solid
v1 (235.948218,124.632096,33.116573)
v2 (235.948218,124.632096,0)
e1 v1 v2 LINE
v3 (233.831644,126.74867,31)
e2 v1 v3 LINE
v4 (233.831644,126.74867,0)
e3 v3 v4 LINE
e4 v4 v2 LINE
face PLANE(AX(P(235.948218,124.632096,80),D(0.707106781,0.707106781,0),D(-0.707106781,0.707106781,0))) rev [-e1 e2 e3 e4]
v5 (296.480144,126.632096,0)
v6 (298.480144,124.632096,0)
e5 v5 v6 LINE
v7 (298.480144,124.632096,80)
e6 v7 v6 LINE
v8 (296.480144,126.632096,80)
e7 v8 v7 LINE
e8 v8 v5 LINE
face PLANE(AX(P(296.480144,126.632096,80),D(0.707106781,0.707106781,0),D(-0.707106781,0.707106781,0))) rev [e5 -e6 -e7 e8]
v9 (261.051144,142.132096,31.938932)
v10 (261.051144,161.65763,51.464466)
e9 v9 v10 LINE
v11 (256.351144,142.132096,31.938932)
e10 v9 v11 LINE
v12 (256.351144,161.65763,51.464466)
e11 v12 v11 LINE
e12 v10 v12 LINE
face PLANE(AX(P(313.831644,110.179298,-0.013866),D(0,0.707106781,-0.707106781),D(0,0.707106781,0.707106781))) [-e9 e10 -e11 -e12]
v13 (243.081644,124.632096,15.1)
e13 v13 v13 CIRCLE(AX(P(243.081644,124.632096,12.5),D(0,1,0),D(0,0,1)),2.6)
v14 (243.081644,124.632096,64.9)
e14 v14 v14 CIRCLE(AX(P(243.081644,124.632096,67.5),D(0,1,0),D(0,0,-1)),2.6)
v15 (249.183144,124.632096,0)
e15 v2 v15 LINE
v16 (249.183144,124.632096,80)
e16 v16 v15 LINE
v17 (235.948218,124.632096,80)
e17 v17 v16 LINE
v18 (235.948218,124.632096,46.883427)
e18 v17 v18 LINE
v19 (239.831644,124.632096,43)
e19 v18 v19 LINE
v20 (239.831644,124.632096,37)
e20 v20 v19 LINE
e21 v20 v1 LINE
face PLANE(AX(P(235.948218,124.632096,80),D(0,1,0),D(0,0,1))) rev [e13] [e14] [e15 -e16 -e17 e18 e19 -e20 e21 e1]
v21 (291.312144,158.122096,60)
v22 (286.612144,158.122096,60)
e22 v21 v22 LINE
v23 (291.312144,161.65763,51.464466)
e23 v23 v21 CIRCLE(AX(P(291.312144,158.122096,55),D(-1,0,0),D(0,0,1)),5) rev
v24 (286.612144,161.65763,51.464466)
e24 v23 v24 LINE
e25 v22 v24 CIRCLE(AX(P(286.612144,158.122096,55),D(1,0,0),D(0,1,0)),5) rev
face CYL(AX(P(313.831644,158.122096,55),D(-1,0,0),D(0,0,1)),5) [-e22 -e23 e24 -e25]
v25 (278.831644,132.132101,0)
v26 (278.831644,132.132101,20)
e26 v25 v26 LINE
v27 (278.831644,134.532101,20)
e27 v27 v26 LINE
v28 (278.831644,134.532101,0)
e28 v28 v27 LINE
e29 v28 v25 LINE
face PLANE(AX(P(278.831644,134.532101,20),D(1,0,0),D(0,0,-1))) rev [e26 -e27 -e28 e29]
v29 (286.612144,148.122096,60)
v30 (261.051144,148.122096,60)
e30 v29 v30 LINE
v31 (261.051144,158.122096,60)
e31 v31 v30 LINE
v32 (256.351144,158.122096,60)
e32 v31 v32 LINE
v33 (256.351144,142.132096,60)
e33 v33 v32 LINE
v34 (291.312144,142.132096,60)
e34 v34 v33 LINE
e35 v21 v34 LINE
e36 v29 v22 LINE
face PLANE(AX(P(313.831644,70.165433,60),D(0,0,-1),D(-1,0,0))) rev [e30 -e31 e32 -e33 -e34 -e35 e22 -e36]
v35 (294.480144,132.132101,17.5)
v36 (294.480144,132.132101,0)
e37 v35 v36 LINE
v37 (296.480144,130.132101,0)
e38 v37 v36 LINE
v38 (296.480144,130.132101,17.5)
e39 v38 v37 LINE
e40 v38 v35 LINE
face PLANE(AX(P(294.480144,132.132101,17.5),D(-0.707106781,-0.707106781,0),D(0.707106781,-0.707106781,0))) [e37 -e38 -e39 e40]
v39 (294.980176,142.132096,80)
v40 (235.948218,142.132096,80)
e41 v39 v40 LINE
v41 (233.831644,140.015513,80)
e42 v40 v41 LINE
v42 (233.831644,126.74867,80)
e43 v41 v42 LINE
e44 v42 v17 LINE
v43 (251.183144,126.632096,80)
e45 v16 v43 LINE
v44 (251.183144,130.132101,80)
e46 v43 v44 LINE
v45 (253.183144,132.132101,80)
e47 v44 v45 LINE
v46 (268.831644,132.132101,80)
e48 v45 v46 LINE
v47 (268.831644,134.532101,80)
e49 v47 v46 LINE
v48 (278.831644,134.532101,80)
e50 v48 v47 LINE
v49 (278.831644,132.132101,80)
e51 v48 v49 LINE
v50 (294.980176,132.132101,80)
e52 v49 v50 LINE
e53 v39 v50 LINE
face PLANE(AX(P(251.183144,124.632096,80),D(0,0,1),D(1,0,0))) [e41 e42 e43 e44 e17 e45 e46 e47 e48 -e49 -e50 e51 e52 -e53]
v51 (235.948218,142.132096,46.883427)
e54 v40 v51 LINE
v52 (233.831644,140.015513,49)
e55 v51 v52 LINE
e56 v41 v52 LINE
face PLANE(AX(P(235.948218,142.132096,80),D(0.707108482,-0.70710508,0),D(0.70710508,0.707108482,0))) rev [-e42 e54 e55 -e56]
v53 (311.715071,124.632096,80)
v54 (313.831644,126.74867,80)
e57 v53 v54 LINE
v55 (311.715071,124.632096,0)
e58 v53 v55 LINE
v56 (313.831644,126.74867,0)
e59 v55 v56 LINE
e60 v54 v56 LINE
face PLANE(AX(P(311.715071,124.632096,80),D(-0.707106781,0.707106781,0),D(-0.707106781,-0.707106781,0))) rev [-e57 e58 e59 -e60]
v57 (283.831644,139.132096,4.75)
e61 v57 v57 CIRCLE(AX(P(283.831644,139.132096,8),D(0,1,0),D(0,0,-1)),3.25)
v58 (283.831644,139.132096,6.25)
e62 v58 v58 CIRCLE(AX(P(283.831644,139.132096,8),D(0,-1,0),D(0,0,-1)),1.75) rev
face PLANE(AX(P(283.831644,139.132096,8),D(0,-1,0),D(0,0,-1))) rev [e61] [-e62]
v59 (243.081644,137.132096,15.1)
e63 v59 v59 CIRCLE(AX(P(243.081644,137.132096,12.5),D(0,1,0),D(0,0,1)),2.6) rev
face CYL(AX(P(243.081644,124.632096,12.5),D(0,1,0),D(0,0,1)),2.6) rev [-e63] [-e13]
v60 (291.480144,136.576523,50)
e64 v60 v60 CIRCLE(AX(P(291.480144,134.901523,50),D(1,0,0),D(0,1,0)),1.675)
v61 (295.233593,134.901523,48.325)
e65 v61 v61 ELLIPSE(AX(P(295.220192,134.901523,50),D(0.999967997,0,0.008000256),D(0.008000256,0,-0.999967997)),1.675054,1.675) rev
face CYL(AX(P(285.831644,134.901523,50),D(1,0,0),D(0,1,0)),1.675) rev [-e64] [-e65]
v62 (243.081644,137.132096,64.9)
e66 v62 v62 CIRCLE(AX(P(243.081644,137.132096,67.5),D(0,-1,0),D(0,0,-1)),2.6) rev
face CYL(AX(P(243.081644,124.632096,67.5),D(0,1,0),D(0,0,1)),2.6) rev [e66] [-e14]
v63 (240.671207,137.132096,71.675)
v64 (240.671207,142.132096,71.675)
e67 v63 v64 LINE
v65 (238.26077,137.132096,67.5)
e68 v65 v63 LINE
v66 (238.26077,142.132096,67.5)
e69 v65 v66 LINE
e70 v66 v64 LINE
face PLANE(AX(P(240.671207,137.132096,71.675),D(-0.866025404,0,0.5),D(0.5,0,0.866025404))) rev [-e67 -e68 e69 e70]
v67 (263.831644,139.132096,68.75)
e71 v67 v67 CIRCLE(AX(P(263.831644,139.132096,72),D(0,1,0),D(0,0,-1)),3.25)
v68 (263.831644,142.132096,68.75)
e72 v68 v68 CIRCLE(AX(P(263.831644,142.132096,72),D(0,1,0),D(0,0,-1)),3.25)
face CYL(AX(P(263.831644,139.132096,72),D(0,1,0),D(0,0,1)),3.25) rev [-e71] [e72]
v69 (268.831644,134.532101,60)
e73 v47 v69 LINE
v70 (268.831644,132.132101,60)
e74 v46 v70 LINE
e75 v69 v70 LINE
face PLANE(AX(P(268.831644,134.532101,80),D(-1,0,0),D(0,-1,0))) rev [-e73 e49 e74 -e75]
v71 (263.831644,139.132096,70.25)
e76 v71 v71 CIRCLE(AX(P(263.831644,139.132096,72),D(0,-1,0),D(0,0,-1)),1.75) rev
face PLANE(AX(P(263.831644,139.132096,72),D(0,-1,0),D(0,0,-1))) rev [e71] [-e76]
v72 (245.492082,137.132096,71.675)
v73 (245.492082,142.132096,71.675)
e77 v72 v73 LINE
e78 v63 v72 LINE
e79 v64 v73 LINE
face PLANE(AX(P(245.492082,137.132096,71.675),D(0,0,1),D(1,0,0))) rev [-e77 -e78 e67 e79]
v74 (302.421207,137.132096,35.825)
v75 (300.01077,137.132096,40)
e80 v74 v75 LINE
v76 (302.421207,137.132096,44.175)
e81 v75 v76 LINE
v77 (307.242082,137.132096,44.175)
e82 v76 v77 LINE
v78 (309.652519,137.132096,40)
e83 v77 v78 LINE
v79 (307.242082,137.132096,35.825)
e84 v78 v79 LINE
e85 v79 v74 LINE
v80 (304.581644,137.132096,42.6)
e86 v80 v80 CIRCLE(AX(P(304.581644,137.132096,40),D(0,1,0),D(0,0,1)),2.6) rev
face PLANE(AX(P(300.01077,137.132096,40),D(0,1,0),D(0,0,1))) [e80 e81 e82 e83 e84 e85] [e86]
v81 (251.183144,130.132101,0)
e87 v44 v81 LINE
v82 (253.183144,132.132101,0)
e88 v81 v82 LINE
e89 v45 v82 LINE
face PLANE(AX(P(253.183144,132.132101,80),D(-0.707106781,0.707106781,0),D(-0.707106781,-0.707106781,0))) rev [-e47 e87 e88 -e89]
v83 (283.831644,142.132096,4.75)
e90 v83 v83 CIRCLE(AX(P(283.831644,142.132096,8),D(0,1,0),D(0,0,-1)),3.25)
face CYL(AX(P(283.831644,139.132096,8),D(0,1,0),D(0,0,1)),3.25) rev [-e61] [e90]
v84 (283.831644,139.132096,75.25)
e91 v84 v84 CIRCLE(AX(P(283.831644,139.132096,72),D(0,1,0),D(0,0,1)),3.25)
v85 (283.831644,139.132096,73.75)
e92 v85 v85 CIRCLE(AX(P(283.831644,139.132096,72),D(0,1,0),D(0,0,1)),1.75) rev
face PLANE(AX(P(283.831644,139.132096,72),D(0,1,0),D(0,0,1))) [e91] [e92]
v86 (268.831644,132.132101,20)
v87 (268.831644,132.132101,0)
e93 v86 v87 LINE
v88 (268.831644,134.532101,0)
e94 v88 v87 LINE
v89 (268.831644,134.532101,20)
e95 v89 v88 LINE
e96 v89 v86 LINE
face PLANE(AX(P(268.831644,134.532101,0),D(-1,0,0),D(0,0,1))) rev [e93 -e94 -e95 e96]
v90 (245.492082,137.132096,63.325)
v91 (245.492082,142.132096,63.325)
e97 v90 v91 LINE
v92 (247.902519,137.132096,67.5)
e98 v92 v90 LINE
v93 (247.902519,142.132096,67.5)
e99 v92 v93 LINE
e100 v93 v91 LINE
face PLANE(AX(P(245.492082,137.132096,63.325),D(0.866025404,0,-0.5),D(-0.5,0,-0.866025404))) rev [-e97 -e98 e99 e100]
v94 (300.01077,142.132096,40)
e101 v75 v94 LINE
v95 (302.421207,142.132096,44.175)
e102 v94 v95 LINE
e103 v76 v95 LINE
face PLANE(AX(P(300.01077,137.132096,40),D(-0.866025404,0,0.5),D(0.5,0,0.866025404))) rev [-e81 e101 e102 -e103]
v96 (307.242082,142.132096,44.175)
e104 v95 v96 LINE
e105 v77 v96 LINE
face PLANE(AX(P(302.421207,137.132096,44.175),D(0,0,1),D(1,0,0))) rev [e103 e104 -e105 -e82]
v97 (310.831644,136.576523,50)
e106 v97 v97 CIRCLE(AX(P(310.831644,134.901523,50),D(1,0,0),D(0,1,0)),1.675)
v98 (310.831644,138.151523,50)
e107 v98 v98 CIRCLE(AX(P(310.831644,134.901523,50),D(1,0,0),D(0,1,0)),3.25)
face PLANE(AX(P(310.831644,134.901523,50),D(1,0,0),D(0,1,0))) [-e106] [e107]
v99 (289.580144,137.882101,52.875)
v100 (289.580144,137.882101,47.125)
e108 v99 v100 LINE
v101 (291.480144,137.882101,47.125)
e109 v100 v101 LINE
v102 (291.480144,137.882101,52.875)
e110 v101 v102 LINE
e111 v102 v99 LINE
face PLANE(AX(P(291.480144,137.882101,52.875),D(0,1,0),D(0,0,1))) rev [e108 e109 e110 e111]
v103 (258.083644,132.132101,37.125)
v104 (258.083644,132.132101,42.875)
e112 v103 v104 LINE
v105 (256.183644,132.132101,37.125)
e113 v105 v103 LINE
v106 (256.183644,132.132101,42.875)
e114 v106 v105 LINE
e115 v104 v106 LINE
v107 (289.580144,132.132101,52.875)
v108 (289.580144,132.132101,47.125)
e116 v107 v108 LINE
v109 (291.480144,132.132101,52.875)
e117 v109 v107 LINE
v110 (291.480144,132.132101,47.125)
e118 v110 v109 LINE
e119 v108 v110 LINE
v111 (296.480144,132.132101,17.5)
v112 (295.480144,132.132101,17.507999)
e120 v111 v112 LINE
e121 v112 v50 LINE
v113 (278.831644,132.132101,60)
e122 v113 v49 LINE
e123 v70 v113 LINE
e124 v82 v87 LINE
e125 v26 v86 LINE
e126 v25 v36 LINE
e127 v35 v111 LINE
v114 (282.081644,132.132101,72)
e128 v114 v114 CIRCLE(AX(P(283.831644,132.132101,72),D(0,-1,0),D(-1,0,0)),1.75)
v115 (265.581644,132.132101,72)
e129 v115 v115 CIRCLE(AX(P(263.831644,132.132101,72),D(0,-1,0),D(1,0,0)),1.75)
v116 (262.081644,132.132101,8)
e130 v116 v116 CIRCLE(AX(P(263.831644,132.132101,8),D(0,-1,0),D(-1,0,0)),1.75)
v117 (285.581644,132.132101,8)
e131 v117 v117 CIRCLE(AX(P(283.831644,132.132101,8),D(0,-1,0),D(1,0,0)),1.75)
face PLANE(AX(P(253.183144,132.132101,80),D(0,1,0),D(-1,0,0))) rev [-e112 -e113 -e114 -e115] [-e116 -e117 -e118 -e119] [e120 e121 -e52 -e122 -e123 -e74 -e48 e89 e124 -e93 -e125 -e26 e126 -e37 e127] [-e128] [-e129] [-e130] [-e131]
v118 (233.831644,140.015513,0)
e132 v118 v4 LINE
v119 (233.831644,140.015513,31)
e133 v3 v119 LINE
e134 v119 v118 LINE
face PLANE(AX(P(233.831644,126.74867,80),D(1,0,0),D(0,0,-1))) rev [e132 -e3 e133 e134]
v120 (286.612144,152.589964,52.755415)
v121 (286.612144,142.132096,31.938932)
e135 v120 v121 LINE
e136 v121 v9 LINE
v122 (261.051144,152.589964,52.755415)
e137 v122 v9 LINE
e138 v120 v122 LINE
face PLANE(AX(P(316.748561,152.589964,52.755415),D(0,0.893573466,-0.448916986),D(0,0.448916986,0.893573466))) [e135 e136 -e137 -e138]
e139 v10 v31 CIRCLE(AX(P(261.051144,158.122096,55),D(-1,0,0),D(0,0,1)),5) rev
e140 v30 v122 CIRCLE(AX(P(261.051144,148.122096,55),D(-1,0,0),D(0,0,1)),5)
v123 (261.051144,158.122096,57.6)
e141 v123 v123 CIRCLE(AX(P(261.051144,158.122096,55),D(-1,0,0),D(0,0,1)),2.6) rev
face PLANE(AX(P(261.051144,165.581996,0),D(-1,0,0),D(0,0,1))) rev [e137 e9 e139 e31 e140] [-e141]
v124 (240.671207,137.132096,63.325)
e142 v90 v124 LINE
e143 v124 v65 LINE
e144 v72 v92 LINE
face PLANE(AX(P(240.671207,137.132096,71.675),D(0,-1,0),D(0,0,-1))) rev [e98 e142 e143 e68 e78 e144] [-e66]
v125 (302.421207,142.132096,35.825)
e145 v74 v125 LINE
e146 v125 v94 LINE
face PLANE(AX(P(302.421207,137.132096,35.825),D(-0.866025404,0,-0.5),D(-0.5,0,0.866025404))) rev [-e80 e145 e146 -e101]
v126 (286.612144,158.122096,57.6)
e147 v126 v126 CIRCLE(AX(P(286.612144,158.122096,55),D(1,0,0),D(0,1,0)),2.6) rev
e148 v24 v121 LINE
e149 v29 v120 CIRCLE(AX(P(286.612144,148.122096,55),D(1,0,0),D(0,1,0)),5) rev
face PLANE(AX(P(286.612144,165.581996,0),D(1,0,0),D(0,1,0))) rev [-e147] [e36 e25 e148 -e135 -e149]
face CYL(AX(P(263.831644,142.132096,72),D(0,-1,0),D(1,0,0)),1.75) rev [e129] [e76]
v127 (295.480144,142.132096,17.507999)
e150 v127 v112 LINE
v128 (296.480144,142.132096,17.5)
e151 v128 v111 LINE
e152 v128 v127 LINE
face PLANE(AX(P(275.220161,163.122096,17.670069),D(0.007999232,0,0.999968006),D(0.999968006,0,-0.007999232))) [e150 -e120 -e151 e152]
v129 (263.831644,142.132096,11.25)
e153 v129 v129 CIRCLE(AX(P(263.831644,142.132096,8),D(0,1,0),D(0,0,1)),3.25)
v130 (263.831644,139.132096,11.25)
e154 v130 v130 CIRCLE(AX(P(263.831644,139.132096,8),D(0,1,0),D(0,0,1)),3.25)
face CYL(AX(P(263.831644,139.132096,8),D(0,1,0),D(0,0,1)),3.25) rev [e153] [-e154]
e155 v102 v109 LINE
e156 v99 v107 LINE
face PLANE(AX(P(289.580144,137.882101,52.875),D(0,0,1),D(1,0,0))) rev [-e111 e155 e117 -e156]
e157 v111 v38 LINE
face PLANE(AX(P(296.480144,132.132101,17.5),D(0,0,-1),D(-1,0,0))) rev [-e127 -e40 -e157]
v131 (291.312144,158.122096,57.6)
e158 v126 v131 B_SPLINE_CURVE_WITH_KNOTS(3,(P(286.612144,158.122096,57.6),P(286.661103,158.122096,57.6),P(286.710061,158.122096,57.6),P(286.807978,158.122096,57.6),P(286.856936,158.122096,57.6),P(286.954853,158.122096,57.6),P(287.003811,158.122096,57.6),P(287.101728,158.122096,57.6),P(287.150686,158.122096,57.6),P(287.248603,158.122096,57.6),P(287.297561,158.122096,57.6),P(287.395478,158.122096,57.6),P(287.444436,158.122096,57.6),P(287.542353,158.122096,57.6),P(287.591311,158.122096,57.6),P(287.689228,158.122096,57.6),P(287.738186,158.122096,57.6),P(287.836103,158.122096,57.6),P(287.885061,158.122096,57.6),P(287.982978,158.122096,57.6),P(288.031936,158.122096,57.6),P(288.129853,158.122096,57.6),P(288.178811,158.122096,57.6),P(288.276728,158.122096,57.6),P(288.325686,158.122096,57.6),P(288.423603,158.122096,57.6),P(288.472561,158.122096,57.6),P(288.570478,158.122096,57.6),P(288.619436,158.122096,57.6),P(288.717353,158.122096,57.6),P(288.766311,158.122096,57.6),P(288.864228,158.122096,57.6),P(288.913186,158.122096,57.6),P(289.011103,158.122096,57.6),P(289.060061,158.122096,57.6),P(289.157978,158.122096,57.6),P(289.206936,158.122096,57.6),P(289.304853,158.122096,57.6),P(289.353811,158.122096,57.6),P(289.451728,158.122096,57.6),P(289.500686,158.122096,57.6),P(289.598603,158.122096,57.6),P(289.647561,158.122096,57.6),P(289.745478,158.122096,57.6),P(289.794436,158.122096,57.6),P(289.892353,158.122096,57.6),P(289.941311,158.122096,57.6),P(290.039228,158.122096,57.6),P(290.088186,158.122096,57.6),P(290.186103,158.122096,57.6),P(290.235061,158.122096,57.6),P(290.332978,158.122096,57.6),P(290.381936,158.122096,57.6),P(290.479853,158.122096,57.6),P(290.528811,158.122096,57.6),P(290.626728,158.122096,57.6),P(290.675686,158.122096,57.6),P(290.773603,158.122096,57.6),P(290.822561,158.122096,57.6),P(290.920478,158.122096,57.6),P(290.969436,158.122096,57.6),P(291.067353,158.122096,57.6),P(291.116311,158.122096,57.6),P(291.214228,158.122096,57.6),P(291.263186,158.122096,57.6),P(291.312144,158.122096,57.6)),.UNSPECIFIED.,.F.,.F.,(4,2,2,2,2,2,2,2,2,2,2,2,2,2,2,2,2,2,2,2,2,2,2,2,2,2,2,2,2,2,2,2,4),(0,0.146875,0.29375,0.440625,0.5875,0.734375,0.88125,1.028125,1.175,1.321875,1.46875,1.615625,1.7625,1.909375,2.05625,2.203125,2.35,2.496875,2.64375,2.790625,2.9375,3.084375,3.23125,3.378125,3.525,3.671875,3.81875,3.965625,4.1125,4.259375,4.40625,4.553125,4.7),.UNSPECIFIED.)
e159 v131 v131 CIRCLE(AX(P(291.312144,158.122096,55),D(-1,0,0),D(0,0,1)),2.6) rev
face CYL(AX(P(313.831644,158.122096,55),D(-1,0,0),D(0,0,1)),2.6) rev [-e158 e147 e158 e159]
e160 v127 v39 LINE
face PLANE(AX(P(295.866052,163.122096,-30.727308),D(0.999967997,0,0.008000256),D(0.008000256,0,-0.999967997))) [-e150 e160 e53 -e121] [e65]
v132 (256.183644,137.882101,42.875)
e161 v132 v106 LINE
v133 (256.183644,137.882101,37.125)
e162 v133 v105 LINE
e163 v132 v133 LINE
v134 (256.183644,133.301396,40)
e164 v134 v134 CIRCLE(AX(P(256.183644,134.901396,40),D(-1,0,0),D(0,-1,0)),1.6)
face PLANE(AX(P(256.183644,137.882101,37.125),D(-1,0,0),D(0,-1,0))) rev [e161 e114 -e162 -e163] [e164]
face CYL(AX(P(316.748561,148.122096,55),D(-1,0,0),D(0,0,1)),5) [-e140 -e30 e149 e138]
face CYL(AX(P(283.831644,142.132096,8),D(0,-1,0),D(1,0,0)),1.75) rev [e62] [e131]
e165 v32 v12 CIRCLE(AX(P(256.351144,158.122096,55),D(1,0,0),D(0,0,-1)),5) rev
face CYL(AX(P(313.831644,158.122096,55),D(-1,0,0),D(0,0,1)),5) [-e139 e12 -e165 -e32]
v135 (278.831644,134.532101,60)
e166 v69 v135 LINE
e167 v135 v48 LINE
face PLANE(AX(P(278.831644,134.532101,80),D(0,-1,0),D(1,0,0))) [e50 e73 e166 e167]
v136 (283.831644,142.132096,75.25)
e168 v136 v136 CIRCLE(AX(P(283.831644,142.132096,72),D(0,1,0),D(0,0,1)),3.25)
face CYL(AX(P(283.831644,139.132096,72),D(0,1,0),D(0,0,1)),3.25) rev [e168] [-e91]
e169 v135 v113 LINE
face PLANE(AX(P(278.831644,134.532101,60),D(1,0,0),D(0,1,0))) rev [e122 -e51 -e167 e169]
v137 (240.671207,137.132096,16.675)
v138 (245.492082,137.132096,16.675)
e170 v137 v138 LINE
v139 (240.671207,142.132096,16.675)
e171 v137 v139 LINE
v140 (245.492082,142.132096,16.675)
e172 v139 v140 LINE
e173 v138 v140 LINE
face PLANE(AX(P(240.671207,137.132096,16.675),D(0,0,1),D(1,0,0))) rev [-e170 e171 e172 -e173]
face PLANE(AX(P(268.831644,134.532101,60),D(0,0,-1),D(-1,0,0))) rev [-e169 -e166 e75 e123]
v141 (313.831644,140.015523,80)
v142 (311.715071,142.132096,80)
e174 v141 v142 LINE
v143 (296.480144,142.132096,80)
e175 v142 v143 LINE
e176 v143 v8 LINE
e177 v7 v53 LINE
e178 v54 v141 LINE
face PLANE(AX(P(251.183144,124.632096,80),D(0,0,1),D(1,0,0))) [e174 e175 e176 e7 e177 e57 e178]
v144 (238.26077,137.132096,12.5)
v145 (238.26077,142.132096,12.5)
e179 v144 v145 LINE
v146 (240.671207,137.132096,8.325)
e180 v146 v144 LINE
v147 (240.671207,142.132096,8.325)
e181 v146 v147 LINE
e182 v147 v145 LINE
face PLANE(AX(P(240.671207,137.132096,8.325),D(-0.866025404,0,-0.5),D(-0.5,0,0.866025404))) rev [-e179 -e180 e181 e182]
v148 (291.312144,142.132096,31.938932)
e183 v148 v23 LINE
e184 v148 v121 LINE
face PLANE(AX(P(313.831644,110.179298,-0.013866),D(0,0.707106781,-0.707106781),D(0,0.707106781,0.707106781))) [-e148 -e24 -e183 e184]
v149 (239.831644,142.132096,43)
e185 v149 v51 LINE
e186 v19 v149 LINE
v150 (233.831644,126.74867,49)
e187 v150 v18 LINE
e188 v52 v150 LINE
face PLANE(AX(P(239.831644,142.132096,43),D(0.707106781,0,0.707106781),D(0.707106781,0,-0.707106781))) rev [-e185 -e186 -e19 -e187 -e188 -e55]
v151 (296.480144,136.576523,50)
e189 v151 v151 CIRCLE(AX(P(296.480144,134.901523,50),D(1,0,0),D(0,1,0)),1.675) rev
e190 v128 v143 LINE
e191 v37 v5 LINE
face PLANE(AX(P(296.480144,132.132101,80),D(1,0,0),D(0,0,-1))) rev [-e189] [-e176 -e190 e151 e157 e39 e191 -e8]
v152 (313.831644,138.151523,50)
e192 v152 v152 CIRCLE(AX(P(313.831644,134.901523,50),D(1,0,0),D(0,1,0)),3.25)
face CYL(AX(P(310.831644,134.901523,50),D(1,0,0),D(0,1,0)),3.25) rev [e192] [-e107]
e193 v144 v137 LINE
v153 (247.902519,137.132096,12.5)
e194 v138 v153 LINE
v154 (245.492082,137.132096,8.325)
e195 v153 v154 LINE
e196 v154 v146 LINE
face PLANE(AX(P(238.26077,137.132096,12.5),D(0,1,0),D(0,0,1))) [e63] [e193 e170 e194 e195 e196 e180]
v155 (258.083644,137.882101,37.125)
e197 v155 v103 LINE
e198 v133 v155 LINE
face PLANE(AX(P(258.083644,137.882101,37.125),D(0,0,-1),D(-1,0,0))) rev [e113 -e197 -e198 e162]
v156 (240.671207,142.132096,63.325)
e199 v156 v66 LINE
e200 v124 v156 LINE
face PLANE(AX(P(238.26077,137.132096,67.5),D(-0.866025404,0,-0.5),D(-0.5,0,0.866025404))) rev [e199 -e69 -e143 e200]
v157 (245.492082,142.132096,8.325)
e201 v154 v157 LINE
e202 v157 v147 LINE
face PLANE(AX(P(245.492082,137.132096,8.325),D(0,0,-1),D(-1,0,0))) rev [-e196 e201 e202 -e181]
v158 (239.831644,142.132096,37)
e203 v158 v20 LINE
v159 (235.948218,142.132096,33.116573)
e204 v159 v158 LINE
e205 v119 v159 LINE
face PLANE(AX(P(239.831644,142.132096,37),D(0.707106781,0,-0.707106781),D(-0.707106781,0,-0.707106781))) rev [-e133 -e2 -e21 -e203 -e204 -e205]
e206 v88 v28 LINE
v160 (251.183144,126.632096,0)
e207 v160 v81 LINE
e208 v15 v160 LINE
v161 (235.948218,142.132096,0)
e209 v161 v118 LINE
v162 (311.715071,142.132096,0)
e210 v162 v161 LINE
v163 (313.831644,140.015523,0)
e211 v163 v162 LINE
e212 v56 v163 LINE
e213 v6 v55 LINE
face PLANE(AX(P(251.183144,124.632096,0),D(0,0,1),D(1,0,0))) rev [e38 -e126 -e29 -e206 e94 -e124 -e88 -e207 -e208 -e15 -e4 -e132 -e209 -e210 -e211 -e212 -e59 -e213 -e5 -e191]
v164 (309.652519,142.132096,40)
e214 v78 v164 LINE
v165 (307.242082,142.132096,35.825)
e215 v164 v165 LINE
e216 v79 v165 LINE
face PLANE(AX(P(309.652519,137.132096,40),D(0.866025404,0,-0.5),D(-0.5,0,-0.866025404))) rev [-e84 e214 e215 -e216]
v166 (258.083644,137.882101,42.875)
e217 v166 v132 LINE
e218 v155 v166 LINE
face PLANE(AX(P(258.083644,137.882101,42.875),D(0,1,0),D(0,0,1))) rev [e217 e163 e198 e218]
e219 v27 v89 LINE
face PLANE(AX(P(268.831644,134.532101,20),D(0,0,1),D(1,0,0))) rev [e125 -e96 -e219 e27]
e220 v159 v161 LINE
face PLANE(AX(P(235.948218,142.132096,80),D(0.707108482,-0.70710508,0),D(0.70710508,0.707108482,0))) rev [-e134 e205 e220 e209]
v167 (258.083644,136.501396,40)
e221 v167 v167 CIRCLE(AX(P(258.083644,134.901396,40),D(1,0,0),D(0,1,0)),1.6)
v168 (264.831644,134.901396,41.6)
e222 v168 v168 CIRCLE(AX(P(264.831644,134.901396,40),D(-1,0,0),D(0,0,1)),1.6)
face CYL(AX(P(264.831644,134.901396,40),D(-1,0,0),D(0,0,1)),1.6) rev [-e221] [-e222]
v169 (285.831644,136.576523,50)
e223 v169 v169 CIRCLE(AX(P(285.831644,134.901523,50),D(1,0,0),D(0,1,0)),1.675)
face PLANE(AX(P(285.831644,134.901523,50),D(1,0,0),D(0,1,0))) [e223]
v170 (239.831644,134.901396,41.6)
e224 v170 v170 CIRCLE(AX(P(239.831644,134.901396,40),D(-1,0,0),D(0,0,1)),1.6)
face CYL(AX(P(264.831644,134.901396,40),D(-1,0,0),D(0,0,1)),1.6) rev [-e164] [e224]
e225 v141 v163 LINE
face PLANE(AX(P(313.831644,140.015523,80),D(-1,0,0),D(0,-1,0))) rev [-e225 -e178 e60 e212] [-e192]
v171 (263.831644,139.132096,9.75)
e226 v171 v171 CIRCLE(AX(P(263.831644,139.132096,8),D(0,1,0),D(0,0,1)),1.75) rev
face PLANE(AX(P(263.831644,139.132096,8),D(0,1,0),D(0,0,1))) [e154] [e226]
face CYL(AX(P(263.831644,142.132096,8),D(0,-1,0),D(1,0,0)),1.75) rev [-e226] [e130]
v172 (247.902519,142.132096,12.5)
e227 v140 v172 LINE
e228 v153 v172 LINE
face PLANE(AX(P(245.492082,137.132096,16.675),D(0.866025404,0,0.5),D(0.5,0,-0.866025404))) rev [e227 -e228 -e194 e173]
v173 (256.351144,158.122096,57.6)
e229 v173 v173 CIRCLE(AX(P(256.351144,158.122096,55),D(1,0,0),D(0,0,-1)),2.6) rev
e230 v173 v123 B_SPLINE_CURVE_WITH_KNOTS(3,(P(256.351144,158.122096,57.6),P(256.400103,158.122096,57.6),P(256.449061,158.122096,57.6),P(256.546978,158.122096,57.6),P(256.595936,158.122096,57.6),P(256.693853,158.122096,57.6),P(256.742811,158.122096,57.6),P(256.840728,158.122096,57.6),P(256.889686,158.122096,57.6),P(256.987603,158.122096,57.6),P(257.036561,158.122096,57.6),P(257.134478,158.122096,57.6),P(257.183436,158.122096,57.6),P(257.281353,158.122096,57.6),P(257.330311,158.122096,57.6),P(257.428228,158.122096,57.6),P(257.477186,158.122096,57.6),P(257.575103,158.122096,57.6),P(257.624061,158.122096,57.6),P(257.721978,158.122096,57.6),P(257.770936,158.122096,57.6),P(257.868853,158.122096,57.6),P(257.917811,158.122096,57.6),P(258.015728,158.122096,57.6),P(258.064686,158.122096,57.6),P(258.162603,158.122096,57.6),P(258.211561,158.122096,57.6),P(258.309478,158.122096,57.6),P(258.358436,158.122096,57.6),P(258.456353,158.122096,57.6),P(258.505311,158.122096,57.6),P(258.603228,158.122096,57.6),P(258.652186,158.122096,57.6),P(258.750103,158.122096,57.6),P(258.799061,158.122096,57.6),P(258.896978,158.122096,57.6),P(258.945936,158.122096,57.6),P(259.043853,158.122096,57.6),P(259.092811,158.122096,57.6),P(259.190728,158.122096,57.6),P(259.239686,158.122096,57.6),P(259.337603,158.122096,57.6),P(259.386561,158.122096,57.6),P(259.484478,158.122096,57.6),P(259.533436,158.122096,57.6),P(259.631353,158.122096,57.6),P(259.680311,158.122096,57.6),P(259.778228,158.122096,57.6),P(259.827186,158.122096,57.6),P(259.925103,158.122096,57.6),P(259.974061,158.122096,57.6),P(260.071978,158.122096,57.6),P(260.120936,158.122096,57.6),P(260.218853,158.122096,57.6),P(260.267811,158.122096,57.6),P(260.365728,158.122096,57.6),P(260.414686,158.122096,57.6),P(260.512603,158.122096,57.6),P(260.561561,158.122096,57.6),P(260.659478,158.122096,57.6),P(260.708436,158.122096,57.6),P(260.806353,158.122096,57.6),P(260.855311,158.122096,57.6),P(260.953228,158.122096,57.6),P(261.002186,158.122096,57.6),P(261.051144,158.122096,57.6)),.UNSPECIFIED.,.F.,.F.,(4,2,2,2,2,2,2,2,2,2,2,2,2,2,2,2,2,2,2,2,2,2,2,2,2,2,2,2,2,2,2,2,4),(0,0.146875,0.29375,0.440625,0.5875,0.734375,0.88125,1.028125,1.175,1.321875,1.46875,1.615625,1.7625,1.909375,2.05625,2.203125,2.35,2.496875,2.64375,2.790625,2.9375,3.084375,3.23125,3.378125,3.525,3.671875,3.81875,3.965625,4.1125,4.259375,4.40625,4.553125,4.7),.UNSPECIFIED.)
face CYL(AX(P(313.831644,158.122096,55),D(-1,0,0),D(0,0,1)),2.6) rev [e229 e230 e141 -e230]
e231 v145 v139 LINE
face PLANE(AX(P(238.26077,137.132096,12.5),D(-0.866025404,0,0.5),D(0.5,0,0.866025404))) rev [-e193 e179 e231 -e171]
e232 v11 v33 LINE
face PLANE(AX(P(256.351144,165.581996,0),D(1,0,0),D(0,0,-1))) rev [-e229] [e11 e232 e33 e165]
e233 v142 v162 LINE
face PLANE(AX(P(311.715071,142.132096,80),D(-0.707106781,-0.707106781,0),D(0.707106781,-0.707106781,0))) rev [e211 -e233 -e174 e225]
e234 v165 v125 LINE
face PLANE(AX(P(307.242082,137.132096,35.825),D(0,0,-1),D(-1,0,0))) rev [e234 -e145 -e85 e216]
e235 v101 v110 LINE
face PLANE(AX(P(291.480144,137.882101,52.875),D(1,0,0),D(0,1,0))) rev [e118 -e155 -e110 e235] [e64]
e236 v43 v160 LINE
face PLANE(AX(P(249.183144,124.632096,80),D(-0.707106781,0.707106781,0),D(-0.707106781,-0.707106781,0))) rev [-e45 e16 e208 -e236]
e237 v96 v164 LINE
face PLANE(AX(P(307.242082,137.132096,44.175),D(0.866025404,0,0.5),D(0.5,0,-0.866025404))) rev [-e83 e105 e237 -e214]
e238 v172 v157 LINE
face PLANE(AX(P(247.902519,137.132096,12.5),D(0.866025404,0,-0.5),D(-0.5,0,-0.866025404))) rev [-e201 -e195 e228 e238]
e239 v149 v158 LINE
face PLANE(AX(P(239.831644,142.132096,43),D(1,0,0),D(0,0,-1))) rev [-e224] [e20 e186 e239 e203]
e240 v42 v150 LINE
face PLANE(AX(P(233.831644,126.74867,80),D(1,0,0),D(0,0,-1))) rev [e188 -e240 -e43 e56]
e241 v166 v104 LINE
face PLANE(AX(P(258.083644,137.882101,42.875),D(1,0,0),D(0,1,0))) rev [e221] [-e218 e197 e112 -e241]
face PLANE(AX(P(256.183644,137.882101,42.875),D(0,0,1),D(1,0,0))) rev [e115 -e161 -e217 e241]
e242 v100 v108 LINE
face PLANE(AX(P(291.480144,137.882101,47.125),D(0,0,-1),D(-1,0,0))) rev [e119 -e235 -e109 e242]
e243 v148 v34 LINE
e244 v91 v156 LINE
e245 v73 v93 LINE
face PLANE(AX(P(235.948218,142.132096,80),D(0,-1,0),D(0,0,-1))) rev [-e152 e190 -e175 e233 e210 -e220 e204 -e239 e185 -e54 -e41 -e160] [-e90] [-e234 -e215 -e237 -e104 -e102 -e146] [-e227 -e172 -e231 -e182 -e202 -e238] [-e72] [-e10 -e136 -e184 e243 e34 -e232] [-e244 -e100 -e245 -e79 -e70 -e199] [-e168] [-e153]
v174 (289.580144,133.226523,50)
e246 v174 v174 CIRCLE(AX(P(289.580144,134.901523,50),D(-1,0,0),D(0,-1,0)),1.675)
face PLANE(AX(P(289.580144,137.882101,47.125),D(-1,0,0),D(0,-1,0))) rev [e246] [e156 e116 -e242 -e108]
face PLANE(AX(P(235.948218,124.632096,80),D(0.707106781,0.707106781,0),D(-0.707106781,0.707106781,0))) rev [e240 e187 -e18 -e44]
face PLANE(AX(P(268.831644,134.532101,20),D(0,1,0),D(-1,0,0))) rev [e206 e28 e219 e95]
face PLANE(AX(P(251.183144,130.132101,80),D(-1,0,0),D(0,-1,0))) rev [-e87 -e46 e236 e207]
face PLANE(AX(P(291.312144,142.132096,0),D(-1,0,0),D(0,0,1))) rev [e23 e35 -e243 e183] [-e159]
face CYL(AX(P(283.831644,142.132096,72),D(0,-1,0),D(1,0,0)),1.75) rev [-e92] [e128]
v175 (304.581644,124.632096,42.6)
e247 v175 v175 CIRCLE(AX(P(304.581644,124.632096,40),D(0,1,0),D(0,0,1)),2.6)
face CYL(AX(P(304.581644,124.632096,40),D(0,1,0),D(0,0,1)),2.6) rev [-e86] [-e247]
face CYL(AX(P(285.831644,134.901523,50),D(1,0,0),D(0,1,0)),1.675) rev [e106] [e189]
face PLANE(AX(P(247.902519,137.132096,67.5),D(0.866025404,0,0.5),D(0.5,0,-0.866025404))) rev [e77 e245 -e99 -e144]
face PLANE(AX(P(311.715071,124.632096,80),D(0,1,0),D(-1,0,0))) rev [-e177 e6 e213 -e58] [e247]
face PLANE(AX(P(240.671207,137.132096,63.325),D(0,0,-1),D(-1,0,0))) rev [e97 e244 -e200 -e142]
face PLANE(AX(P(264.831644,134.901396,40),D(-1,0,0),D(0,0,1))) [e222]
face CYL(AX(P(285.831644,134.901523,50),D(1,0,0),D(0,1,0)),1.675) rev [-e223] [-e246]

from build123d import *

# Parameters (mm, degrees)
BOSS_EXTRUDE1_DEPTH = 80
SKETCH2_R           = 2.6
CUT_EXTRUDE1_DEPTH  = 325.340177974
SKETCH7_W           = 1.9
SKETCH7_H           = 5.75
CUT_EXTRUDE5_DEPTH  = 5.75
SKETCH9_W           = 10
SKETCH9_H           = 20
CUT_EXTRUDE6_DEPTH  = 2.4
CUT_EXTRUDE7_START  = -9.999995
SKETCH11_R          = 1.75
CUT_EXTRUDE7_DEPTH  = 9.999995
SKETCH13_R          = 3.25
CUT_EXTRUDE8_DEPTH  = 3
SKETCH15_R          = 2.6
BOSS_EXTRUDE7_DEPTH = 80
CUT_EXTRUDE12_DEPTH = 5
SKETCH5_R           = 3.25
CUT_EXTRUDE22_DEPTH = 3
SKETCH30_R          = 1.675
CUT_EXTRUDE23_DEPTH = 25
CUT_EXTRUDE34_DEPTH = 326.347016047
BOSS_EXTRUDE5_DEPTH = 17.5
SKETCH16_W          = 25.561
SKETCH16_H          = 23.4499
SKETCH16_W_2        = 23.8489
CUT_EXTRUDE35_DEPTH = 359.746594886
SKETCH38_W          = 6
SKETCH38_H          = 17.5
CUT_EXTRUDE36_DEPTH = 6
CHAMFER1_SIZE       = 6
CHAMFER2_SIZE       = 6
SKETCH37_R          = 1.6
CUT_EXTRUDE29_DEPTH = 25
BOSS_EXTRUDE8_DEPTH = 30.261


with BuildPart() as part:
    # Sketch1 → Boss-Extrude1 (new body)
    with BuildSketch(Plane.XY):
        Polygon((253.183144434, 132.132101078), (251.183144434, 130.132101078), (251.183144434, 126.632096278), (249.183144434, 124.632096278), (235.948217796, 124.632096278), (233.831644434, 126.74866964), (233.831644434, 140.015512734), (235.948217796, 142.132096278), (311.715071072, 142.132096278), (313.831644434, 140.015522917), (313.831644434, 126.74866964), (311.715071072, 124.632096278), (298.480144434, 124.632096278), (296.480144434, 126.632096278), (296.480144434, 132.132101078), align=None)
    extrude(amount=BOSS_EXTRUDE1_DEPTH)

    # Sketch2 → Cut-Extrude1 (cut, through all)
    with BuildSketch(Plane(origin=(0, 142.132096278, 0), x_dir=(1, 0, 0), z_dir=(0, 1, 0))):
        with Locations(Location((243.081644434, -12.5, 0), (0, 0, 270))):
            Circle(SKETCH2_R)
        with Locations(Location((304.581644434, -40, 0), (0, 0, 270))):
            Circle(SKETCH2_R)
        with Locations(Location((243.081644434, -67.5, 0), (0, 0, 90))):
            Circle(SKETCH2_R)
    extrude(amount=-CUT_EXTRUDE1_DEPTH, mode=Mode.SUBTRACT)

    # Sketch7 → Cut-Extrude5 (cut)
    with BuildSketch(Plane.XZ.offset(-132.132101078)):
        with Locations((290.530144434, 50)):
            Rectangle(SKETCH7_W, SKETCH7_H)
        with Locations((257.133644434, 40)):
            Rectangle(SKETCH7_W, SKETCH7_H)
    extrude(amount=-CUT_EXTRUDE5_DEPTH, mode=Mode.SUBTRACT)

    # Sketch9 → Cut-Extrude6 (cut)
    with BuildSketch(Plane.XZ.offset(-132.132101078)):
        with Locations((273.831644434, 70)):
            Rectangle(SKETCH9_W, SKETCH9_H)
        with Locations((273.831644434, 10)):
            Rectangle(SKETCH9_W, SKETCH9_H)
    extrude(amount=-CUT_EXTRUDE6_DEPTH, mode=Mode.SUBTRACT)

    # Sketch11 → Cut-Extrude7 (cut)
    with BuildSketch(Plane.XZ.offset(-132.132101078).offset(CUT_EXTRUDE7_START)):
        with Locations((263.831644434, 72)):
            Circle(SKETCH11_R)
        with Locations(Location((283.831644434, 72, 0), (0, 0, 180))):
            Circle(SKETCH11_R)
        with Locations((283.831644434, 8)):
            Circle(SKETCH11_R)
        with Locations(Location((263.831644434, 8, 0), (0, 0, 180))):
            Circle(SKETCH11_R)
    extrude(amount=CUT_EXTRUDE7_DEPTH, mode=Mode.SUBTRACT)

    # Sketch13 → Cut-Extrude8 (cut)
    with BuildSketch(Plane(origin=(0, 142.132096278, 0), x_dir=(1, 0, 0), z_dir=(0, 1, 0))):
        with Locations(Location((263.831644434, -8, 0), (0, 0, 270))):
            Circle(SKETCH13_R)
        with Locations(Location((283.831644434, -8, 0), (0, 0, 90))):
            Circle(SKETCH13_R)
        with Locations(Location((283.831644434, -72, 0), (0, 0, 270))):
            Circle(SKETCH13_R)
        with Locations(Location((263.831644434, -72, 0), (0, 0, 90))):
            Circle(SKETCH13_R)
    extrude(amount=-CUT_EXTRUDE8_DEPTH, mode=Mode.SUBTRACT)

    # Sketch15 → Boss-Extrude7 (add, through all)
    with BuildSketch(Plane.ZY.offset(-233.831644434)):
        with BuildLine():
            Line((31.938932188, 142.132096278), (60, 142.132096278))
            Line((60, 142.132096278), (60, 158.122096278))
            ThreePointArc((60, 158.122096278), (56.913417162, 162.741493941), (51.464466094, 161.657630184))
            Line((51.464466094, 161.657630184), (31.938932188, 142.132096278))
        make_face()
        with Locations((55, 158.122096278)):
            Circle(SKETCH15_R, mode=Mode.SUBTRACT)
    extrude(amount=-BOSS_EXTRUDE7_DEPTH)

    # Sketch19 → Cut-Extrude12 (cut)
    with BuildSketch(Plane(origin=(0, 142.132096278, 0), x_dir=(1, 0, 0), z_dir=(0, 1, 0))):
        Polygon((238.260769686, -12.5), (240.67120706, -16.675), (245.492081808, -16.675), (247.902519182, -12.5), (245.492081808, -8.325), (240.67120706, -8.325), align=None)
        Polygon((300.010769686, -40), (302.42120706, -44.175), (307.242081808, -44.175), (309.652519182, -40), (307.242081808, -35.825), (302.42120706, -35.825), align=None)
        Polygon((240.67120706, -71.675), (238.260769686, -67.5), (240.67120706, -63.325), (245.492081808, -63.325), (247.902519182, -67.5), (245.492081808, -71.675), align=None)
    extrude(amount=-CUT_EXTRUDE12_DEPTH, mode=Mode.SUBTRACT)

    # Sketch5 → Cut-Extrude22 (cut)
    with BuildSketch(Plane(origin=(313.831644434, 0, 0), x_dir=(0, 0, -1), z_dir=(1, 0, 0))):
        with Locations(Location((-50, 134.901522917, 0), (0, 0, 90))):
            Circle(SKETCH5_R)
    extrude(amount=-CUT_EXTRUDE22_DEPTH, mode=Mode.SUBTRACT)

    # Sketch30 → Cut-Extrude23 (cut)
    with BuildSketch(Plane(origin=(310.831644434, 0, 0), x_dir=(0, 0, -1), z_dir=(1, 0, 0))):
        with Locations(Location((-50, 134.901522917, 0), (0, 0, 90))):
            Circle(SKETCH30_R)
    extrude(amount=-CUT_EXTRUDE23_DEPTH, mode=Mode.SUBTRACT)

    # Sketch3 → Cut-Extrude34 (cut, through all)
    with BuildSketch(Plane.XZ.offset(-132.132101078)):
        Polygon((296.48017643, 80), (294.98017643, 80), (295.480144434, 17.507999488), (296.480144434, 17.5), align=None)
    extrude(amount=-CUT_EXTRUDE34_DEPTH, mode=Mode.SUBTRACT)

    # Sketch31 → Boss-Extrude5 (add)
    with BuildSketch(Plane(origin=(0, 0, 0), x_dir=(-1, 0, 0), z_dir=(0, 0, -1))):
        Polygon((-296.480144434, 132.132101078), (-296.480144434, 130.132101078), (-294.480144434, 132.132101078), align=None)
    extrude(amount=-BOSS_EXTRUDE5_DEPTH)

    # Sketch16 → Cut-Extrude35 (cut, through all)
    with BuildSketch(Plane.XY.offset(60)):
        with Locations((273.831644434, 153.857046278)):
            Rectangle(SKETCH16_W, SKETCH16_H)
        with Locations((244.426694434, 153.857046278)):
            Rectangle(SKETCH16_W_2, SKETCH16_H)
        with Locations((303.236594434, 153.857046278)):
            Rectangle(SKETCH16_W_2, SKETCH16_H)
    extrude(amount=-CUT_EXTRUDE35_DEPTH, mode=Mode.SUBTRACT)

    # Sketch38 → Cut-Extrude36 (cut)
    with BuildSketch(Plane.ZY.offset(-233.831644434)):
        with Locations((40, 133.382096278)):
            Rectangle(SKETCH38_W, SKETCH38_H)
    extrude(amount=-CUT_EXTRUDE36_DEPTH, mode=Mode.SUBTRACT)

    # Chamfer1
    chamfer1_edges = [part.edges().sort_by_distance(p)[0] for p in [
        (233.831644434, 133.382091187, 43),
    ]]
    chamfer(chamfer1_edges, length=CHAMFER1_SIZE - 0.0001)  # a hair under: the kernel refuses the full size

    # Chamfer2
    chamfer2_edges = [part.edges().sort_by_distance(p)[0] for p in [
        (233.831644434, 133.382091187, 37),
    ]]
    chamfer(chamfer2_edges, length=CHAMFER2_SIZE - 0.0001)  # a hair under: the kernel refuses the full size

    # Sketch37 → Cut-Extrude29 (cut)
    with BuildSketch(Plane.ZY.offset(-239.831644434)):
        with Locations((40, 134.901396278)):
            Circle(SKETCH37_R)
    extrude(amount=-CUT_EXTRUDE29_DEPTH, mode=Mode.SUBTRACT)

    # Sketch39 → Boss-Extrude8 (add)
    with BuildSketch(Plane.ZY.offset(-256.351144434)):
        with BuildLine():
            Line((52.755415069, 152.589963609), (31.938932188, 142.132096278))
            Line((31.938932188, 142.132096278), (60, 142.132096278))
            Line((60, 142.132096278), (60, 148.122096278))
            ThreePointArc((60, 148.122096278), (57.624602384, 152.377852654), (52.755415069, 152.589963609))
        make_face()
    extrude(amount=-BOSS_EXTRUDE8_DEPTH)


solid = part.part
